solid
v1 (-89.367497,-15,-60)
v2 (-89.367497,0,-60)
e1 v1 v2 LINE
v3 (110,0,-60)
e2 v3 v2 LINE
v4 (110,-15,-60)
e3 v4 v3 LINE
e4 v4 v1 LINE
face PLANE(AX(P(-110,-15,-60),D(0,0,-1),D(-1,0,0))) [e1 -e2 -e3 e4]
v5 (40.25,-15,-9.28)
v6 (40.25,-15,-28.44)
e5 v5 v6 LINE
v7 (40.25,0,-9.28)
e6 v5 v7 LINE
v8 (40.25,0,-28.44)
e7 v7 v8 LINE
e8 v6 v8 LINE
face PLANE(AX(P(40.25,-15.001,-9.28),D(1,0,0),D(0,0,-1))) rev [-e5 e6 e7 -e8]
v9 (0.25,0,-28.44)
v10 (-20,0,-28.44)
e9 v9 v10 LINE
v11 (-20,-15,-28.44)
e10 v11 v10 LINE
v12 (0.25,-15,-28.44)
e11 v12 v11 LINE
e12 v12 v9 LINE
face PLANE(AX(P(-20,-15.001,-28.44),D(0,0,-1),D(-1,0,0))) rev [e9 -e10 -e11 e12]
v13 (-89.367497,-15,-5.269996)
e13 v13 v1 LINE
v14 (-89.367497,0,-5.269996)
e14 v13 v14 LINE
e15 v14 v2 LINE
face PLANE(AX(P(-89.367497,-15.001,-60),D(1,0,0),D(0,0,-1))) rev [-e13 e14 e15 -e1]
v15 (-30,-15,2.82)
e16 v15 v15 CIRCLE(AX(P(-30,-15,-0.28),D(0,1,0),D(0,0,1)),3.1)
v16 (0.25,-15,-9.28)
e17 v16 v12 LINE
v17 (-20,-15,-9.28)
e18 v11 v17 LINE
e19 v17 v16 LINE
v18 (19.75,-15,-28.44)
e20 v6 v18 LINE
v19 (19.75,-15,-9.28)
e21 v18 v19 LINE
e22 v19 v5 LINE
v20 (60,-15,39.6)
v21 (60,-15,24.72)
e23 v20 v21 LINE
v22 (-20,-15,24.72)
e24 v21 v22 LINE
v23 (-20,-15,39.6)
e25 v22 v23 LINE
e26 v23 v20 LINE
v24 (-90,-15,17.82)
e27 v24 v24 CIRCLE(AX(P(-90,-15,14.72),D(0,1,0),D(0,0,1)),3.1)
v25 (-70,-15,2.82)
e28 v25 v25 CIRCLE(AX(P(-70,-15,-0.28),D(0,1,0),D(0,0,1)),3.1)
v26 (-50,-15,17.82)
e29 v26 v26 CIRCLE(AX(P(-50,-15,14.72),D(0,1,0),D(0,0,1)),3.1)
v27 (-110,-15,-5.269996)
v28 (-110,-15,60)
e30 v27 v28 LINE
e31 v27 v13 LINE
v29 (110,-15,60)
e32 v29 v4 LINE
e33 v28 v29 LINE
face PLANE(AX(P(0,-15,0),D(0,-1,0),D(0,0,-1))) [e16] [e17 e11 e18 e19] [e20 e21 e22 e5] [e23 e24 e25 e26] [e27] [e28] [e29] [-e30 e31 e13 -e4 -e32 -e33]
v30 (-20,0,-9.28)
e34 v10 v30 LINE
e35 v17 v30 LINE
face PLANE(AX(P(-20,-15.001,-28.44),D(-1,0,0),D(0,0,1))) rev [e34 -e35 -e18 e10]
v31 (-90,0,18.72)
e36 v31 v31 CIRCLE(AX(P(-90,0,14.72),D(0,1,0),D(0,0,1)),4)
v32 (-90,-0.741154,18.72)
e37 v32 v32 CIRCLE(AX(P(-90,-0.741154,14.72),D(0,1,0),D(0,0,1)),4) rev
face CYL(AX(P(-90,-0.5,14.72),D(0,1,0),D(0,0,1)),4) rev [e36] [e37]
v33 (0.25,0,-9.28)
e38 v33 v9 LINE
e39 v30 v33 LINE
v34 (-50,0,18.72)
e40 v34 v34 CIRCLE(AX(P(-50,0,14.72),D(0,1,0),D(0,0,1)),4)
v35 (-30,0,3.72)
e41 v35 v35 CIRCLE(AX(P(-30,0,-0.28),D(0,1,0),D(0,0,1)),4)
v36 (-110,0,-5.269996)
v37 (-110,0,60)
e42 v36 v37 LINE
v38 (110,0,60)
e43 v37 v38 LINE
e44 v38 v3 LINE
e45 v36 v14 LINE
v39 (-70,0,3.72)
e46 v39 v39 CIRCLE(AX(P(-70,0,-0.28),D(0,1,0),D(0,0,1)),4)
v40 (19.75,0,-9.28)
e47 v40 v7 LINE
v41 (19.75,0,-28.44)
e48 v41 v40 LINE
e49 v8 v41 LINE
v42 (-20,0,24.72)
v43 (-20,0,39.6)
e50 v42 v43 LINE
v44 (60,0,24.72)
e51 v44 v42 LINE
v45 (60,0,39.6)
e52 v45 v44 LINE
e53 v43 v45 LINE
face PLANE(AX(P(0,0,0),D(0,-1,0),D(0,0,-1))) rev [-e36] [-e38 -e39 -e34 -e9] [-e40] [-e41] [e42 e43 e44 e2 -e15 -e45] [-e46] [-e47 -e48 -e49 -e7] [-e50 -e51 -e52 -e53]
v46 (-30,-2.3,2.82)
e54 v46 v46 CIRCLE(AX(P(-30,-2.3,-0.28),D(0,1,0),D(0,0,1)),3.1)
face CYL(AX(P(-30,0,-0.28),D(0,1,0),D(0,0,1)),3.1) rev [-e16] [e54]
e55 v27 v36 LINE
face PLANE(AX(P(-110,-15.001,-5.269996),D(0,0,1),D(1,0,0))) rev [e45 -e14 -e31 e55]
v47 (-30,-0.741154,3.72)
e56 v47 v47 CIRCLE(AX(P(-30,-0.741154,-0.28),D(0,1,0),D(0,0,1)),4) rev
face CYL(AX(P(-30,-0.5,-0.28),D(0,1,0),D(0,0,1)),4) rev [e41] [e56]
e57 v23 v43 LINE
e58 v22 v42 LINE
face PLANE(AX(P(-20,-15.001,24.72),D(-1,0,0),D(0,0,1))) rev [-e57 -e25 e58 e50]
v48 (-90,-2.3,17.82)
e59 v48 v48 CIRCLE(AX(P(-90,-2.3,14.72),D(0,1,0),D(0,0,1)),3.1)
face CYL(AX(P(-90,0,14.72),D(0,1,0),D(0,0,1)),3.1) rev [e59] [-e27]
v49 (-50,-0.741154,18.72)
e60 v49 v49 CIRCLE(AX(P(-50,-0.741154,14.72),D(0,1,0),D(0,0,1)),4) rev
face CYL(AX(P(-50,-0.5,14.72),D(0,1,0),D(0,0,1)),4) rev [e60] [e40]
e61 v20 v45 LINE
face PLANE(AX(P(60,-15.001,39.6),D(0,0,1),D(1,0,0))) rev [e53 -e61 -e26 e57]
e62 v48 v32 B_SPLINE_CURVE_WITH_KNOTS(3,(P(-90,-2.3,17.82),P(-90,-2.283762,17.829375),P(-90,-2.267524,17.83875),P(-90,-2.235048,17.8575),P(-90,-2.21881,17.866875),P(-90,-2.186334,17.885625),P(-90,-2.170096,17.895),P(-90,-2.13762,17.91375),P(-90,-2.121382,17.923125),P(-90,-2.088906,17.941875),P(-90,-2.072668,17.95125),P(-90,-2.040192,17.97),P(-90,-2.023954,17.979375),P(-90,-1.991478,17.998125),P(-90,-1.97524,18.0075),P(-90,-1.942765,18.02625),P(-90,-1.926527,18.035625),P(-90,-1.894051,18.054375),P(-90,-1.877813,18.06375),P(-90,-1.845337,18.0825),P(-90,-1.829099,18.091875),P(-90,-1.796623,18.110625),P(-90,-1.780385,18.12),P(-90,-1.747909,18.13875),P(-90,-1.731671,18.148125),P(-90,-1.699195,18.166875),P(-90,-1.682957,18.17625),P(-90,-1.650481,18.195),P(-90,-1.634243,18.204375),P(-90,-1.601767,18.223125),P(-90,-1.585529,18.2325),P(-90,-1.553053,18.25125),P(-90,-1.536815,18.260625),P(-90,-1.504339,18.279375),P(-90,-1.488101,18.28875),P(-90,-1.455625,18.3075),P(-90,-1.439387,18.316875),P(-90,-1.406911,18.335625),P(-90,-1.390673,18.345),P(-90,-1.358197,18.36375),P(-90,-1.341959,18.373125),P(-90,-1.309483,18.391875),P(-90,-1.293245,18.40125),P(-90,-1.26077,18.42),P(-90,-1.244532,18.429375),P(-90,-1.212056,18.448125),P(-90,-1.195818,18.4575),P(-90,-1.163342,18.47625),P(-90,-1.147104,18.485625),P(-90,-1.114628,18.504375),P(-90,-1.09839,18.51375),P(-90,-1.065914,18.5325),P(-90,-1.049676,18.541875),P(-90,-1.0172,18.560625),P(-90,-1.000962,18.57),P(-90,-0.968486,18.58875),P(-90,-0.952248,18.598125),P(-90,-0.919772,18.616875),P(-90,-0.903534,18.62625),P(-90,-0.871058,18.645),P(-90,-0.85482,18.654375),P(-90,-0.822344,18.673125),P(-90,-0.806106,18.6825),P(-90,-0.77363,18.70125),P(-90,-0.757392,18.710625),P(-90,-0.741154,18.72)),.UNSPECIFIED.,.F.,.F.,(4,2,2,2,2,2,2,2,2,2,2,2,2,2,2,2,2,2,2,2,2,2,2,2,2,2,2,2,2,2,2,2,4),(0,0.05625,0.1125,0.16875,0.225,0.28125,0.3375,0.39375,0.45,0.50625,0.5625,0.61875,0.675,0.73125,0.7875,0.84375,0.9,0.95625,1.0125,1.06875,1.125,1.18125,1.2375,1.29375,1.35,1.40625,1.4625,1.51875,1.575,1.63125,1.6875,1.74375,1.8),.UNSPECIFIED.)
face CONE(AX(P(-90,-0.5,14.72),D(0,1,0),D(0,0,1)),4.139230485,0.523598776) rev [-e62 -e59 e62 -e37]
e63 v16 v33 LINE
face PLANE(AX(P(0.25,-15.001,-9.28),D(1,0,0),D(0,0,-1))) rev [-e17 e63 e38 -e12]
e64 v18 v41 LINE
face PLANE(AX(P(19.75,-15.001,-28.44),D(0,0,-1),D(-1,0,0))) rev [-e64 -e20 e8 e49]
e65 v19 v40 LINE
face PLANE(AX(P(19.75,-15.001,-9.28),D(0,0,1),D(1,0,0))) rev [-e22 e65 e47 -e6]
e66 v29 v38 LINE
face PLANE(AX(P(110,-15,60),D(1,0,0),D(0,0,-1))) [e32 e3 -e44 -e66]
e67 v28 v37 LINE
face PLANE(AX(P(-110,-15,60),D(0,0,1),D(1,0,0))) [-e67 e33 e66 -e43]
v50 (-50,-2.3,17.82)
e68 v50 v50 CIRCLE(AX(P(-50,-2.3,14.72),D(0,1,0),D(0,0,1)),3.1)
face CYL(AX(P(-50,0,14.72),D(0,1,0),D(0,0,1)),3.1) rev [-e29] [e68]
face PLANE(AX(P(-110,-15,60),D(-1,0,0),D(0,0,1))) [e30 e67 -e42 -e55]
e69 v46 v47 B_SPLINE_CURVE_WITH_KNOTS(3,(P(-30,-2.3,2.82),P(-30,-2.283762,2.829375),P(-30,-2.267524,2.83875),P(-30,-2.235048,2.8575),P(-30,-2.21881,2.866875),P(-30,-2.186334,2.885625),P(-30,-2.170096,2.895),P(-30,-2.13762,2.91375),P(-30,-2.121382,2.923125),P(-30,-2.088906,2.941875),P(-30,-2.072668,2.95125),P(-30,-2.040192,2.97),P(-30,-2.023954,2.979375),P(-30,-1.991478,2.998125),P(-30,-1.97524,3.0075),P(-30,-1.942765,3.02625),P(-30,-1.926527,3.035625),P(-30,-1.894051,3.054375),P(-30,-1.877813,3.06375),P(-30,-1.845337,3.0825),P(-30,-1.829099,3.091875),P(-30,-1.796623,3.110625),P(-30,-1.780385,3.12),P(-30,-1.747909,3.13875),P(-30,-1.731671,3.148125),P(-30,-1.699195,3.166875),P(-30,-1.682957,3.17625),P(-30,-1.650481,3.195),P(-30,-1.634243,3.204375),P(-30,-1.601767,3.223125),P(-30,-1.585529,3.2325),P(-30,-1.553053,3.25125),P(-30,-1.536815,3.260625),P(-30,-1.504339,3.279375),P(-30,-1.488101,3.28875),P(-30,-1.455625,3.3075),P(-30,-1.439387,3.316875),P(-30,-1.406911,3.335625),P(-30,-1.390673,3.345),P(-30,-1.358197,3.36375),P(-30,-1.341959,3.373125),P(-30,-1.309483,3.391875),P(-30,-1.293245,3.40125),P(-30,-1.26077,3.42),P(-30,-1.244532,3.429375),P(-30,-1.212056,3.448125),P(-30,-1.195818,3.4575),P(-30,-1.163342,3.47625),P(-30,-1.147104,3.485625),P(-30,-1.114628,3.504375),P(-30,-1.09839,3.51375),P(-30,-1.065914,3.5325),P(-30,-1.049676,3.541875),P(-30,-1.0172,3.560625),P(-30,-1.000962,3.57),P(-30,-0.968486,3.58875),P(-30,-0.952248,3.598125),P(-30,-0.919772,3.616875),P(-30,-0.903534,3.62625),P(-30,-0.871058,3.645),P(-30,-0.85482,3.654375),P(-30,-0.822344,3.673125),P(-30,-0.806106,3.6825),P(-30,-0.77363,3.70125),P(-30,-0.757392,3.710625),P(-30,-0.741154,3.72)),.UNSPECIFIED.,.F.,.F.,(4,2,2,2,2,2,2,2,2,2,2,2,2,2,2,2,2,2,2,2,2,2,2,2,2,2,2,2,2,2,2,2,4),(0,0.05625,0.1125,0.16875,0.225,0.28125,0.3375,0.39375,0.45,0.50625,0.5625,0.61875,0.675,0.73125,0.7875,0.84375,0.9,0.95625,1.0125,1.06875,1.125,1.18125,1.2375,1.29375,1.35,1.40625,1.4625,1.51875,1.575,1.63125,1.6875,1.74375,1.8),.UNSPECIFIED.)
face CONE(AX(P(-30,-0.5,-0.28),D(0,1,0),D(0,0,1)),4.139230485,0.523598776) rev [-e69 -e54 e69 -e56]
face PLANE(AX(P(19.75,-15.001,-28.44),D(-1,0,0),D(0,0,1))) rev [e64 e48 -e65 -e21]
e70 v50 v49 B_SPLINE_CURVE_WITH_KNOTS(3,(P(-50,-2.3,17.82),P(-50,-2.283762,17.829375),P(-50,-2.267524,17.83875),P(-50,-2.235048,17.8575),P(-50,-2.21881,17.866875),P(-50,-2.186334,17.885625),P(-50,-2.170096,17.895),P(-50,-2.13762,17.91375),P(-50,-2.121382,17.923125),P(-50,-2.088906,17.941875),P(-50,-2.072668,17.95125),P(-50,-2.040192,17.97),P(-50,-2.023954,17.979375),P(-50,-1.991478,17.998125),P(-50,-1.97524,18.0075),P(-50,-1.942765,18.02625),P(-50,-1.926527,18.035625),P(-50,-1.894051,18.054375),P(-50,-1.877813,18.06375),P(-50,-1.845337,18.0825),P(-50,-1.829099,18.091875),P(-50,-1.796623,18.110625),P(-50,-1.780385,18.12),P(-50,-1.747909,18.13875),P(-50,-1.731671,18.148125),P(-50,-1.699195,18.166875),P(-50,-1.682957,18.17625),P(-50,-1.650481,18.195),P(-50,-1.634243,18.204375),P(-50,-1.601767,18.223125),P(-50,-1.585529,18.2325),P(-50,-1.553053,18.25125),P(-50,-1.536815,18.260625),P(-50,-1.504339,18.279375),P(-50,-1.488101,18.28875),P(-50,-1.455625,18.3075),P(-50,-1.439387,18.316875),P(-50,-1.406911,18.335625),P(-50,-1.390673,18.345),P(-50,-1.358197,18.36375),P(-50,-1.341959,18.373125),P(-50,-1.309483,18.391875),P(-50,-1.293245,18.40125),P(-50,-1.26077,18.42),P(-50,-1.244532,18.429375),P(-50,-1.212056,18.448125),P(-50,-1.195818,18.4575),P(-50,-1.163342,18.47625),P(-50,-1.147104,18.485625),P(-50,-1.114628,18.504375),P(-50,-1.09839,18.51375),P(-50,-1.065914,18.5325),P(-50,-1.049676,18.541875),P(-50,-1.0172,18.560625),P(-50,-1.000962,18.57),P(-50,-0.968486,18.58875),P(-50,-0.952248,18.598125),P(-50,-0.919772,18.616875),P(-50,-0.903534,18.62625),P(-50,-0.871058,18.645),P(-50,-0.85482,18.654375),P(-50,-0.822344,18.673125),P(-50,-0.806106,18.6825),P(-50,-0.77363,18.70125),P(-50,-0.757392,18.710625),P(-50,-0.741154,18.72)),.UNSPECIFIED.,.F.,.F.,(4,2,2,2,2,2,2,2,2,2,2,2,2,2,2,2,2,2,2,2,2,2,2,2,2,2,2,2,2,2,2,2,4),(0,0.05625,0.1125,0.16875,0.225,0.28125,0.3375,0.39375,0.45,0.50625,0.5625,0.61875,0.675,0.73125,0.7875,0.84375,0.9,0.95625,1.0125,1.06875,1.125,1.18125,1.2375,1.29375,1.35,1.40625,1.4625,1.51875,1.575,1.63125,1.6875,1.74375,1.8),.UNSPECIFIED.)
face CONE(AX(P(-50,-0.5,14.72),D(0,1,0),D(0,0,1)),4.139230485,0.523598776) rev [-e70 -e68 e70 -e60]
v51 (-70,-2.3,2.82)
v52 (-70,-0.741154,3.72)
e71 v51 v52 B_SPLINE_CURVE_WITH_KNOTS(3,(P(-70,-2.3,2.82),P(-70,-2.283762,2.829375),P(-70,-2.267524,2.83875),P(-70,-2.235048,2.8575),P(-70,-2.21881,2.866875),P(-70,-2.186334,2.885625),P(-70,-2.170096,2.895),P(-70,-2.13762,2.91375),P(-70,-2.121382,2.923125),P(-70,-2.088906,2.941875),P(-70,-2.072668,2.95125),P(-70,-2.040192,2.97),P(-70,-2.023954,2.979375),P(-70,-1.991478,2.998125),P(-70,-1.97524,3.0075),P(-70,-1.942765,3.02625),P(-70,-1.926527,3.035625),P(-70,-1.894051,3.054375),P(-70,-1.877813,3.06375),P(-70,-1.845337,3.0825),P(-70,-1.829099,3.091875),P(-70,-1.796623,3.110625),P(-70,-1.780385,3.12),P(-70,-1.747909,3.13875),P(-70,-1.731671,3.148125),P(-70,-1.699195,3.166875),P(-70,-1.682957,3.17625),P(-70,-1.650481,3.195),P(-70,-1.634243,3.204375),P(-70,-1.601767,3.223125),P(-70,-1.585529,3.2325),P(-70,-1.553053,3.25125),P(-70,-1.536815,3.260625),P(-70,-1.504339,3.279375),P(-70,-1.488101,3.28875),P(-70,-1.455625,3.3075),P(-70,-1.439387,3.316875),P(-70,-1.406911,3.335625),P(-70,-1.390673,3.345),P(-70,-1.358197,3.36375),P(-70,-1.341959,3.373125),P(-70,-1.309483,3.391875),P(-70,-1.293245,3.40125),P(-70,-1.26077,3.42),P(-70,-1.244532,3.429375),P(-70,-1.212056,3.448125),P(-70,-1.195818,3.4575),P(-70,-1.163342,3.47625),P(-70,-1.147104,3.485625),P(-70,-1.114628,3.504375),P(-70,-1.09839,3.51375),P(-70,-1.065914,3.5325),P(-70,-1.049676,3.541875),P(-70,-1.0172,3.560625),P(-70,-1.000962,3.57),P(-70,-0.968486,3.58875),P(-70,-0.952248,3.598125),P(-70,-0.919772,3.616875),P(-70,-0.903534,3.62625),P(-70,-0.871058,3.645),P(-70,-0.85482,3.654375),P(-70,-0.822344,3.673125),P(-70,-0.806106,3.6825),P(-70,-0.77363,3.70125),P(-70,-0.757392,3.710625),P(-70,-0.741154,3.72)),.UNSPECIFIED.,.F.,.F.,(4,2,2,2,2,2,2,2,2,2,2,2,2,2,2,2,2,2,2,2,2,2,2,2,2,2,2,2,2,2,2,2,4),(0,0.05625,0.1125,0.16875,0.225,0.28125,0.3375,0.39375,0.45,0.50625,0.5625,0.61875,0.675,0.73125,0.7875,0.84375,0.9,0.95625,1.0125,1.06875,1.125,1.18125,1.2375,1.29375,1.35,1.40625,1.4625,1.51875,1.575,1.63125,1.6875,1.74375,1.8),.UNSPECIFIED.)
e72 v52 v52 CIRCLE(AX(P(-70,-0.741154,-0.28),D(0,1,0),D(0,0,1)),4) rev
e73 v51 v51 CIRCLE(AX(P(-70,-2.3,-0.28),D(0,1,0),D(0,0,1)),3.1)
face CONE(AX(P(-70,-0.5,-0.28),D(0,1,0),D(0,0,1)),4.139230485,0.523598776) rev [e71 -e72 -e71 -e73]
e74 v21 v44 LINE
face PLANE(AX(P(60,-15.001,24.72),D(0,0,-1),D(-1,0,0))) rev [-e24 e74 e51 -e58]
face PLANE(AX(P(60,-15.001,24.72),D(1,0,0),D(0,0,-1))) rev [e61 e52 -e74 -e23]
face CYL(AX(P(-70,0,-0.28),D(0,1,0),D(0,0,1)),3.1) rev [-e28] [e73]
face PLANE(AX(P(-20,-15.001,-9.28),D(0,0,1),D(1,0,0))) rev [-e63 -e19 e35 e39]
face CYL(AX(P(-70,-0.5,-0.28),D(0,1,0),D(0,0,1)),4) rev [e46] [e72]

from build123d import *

# Parameters (mm, degrees)
SKETCH1_W                  = 220
SKETCH1_H                  = 120
BOSS_EXTRUDE1_DEPTH        = 15
CUT_EXTRUDE1_REACH         = 128.194
SKETCH2_W                  = 20.632503002
SKETCH2_H                  = 54.730004003
CUT_EXTRUDE2_REACH         = 128.194
SKETCH3_W                  = 20.25
SKETCH3_H                  = 19.16
SKETCH3_W_2                = 20.5
CUT_EXTRUDE3_REACH         = 128.194
SKETCH4_W                  = 80
SKETCH4_H                  = 14.88
F_6_2_6_2_DIAMETER_HOLE1_D = 6.2
SKETCH8_R                  = 4
CUT_EXTRUDE4_DEPTH         = 0.5
CHAMFER1_SIZE              = 1.8
CHAMFER1_SIZE_2            = 1.039230485


with BuildPart() as part:
    # Sketch1 → Boss-Extrude1 (new body)
    with BuildSketch(Plane(origin=(0, 0, 0), x_dir=(1, 0, 0), z_dir=(0, 1, 0))):
        Rectangle(SKETCH1_W, SKETCH1_H)
    extrude(amount=-BOSS_EXTRUDE1_DEPTH)

    # Sketch2 → Cut-Extrude1 (cut, up to next)
    with BuildSketch(Plane(origin=(0, 0, 0), x_dir=(1, 0, 0), z_dir=(0, 1, 0)), mode=Mode.PRIVATE) as cut_extrude1_sk1:
        with Locations((-99.683748499, 32.634997999)):
            Rectangle(SKETCH2_W, SKETCH2_H)
    cut_extrude1_tool1 = extrude(cut_extrude1_sk1.sketch, amount=-CUT_EXTRUDE1_REACH, mode=Mode.PRIVATE) & part.part
    add(cut_extrude1_tool1.solids().sort_by_distance((-99.683748, 0, -32.634998))[0], mode=Mode.SUBTRACT)

    # Sketch3 → Cut-Extrude2 (cut, up to next)
    with BuildSketch(Plane(origin=(0, 0, 0), x_dir=(1, 0, 0), z_dir=(0, 1, 0)), mode=Mode.PRIVATE) as cut_extrude2_sk1:
        with Locations((-9.875, 18.86)):
            Rectangle(SKETCH3_W, SKETCH3_H)
    cut_extrude2_tool1 = extrude(cut_extrude2_sk1.sketch, amount=-CUT_EXTRUDE2_REACH, mode=Mode.PRIVATE) & part.part
    # Sketch3 → Cut-Extrude2 (cut, up to next)
    with BuildSketch(Plane(origin=(0, 0, 0), x_dir=(1, 0, 0), z_dir=(0, 1, 0)), mode=Mode.PRIVATE) as cut_extrude2_sk2:
        with Locations((30, 18.86)):
            Rectangle(SKETCH3_W_2, SKETCH3_H)
    cut_extrude2_tool2 = extrude(cut_extrude2_sk2.sketch, amount=-CUT_EXTRUDE2_REACH, mode=Mode.PRIVATE) & part.part
    add(cut_extrude2_tool1.solids().sort_by_distance((-9.875, 0, -18.86))[0], mode=Mode.SUBTRACT)
    add(cut_extrude2_tool2.solids().sort_by_distance((30, 0, -18.86))[0], mode=Mode.SUBTRACT)

    # Sketch4 → Cut-Extrude3 (cut, up to next)
    with BuildSketch(Plane(origin=(0, 0, 0), x_dir=(1, 0, 0), z_dir=(0, 1, 0)), mode=Mode.PRIVATE) as cut_extrude3_sk1:
        with Locations((20, -32.16)):
            Rectangle(SKETCH4_W, SKETCH4_H)
    cut_extrude3_tool1 = extrude(cut_extrude3_sk1.sketch, amount=-CUT_EXTRUDE3_REACH, mode=Mode.PRIVATE) & part.part
    add(cut_extrude3_tool1.solids().sort_by_distance((20, 0, 32.16))[0], mode=Mode.SUBTRACT)

    # Ø6.2 (6.2) Diameter Hole1 (through all)
    with Locations(Plane(origin=(0, 0, 0), x_dir=(1, 0, 0), z_dir=(0, 1, 0))):
        with Locations((-30, 0.28), (-50, -14.72), (-70, 0.28), (-90, -14.72)):
            Hole(F_6_2_6_2_DIAMETER_HOLE1_D / 2)

    # Sketch8 → Cut-Extrude4 (cut)
    with BuildSketch(Plane(origin=(0, 0, 0), x_dir=(1, 0, 0), z_dir=(0, 1, 0))):
        with Locations(Location((-90, -14.72, 0), (0, 0, 270))):
            Circle(SKETCH8_R)
        with Locations(Location((-70, 0.28, 0), (0, 0, 270))):
            Circle(SKETCH8_R)
        with Locations(Location((-50, -14.72, 0), (0, 0, 270))):
            Circle(SKETCH8_R)
        with Locations(Location((-30, 0.28, 0), (0, 0, 270))):
            Circle(SKETCH8_R)
    extrude(amount=-CUT_EXTRUDE4_DEPTH, mode=Mode.SUBTRACT)

    # Chamfer1
    # the kernel refuses this chamfer: 1.8, 1.039230485 mm, written as the material it takes off along each edge
    with BuildSketch(Plane(origin=(-90, -0.5, 14.72), x_dir=(-1, 0, 0), z_dir=(0, 0, 1))) as chamfer1_piece_1_section:
        Polygon((3.1, CHAMFER1_SIZE), (3.1 + CHAMFER1_SIZE_2, 0), (3.1, 0), align=None)
    chamfer1_piece_1 = revolve(axis=Axis((-90, -0.5, 14.72), (0, -1, 0)), mode=Mode.PRIVATE)
    chamfer1_piece_1 = chamfer1_piece_1 & Plane(origin=(-90, -1.537716701, 14.72), x_dir=(0, 0, 1), z_dir=(0, 1, 0)) * Cylinder(4, 17, mode=Mode.PRIVATE)
    add(chamfer1_piece_1, mode=Mode.SUBTRACT)
    with BuildSketch(Plane(origin=(-30, -0.5, -0.28), x_dir=(-1, 0, 0), z_dir=(0, 0, 1))) as chamfer1_piece_2_section:
        Polygon((3.1, CHAMFER1_SIZE), (3.1 + CHAMFER1_SIZE_2, 0), (3.1, 0), align=None)
    chamfer1_piece_2 = revolve(axis=Axis((-30, -0.5, -0.28), (0, -1, 0)), mode=Mode.PRIVATE)
    chamfer1_piece_2 = chamfer1_piece_2 & Plane(origin=(-30, -1.537716701, -0.28), x_dir=(0, 0, 1), z_dir=(0, 1, 0)) * Cylinder(4, 17, mode=Mode.PRIVATE)
    add(chamfer1_piece_2, mode=Mode.SUBTRACT)
    with BuildSketch(Plane(origin=(-50, -0.5, 14.72), x_dir=(-1, 0, 0), z_dir=(0, 0, 1))) as chamfer1_piece_3_section:
        Polygon((3.1, CHAMFER1_SIZE), (3.1 + CHAMFER1_SIZE_2, 0), (3.1, 0), align=None)
    chamfer1_piece_3 = revolve(axis=Axis((-50, -0.5, 14.72), (0, -1, 0)), mode=Mode.PRIVATE)
    chamfer1_piece_3 = chamfer1_piece_3 & Plane(origin=(-50, -1.537716701, 14.72), x_dir=(0, 0, 1), z_dir=(0, 1, 0)) * Cylinder(4, 17, mode=Mode.PRIVATE)
    add(chamfer1_piece_3, mode=Mode.SUBTRACT)
    with BuildSketch(Plane(origin=(-70, -0.5, -0.28), x_dir=(-1, 0, 0), z_dir=(0, 0, 1))) as chamfer1_piece_4_section:
        Polygon((3.1, CHAMFER1_SIZE), (3.1 + CHAMFER1_SIZE_2, 0), (3.1, 0), align=None)
    chamfer1_piece_4 = revolve(axis=Axis((-70, -0.5, -0.28), (0, -1, 0)), mode=Mode.PRIVATE)
    chamfer1_piece_4 = chamfer1_piece_4 & Plane(origin=(-70, -1.537716701, -0.28), x_dir=(0, 0, 1), z_dir=(0, 1, 0)) * Cylinder(4, 17, mode=Mode.PRIVATE)
    add(chamfer1_piece_4, mode=Mode.SUBTRACT)


solid = part.part
